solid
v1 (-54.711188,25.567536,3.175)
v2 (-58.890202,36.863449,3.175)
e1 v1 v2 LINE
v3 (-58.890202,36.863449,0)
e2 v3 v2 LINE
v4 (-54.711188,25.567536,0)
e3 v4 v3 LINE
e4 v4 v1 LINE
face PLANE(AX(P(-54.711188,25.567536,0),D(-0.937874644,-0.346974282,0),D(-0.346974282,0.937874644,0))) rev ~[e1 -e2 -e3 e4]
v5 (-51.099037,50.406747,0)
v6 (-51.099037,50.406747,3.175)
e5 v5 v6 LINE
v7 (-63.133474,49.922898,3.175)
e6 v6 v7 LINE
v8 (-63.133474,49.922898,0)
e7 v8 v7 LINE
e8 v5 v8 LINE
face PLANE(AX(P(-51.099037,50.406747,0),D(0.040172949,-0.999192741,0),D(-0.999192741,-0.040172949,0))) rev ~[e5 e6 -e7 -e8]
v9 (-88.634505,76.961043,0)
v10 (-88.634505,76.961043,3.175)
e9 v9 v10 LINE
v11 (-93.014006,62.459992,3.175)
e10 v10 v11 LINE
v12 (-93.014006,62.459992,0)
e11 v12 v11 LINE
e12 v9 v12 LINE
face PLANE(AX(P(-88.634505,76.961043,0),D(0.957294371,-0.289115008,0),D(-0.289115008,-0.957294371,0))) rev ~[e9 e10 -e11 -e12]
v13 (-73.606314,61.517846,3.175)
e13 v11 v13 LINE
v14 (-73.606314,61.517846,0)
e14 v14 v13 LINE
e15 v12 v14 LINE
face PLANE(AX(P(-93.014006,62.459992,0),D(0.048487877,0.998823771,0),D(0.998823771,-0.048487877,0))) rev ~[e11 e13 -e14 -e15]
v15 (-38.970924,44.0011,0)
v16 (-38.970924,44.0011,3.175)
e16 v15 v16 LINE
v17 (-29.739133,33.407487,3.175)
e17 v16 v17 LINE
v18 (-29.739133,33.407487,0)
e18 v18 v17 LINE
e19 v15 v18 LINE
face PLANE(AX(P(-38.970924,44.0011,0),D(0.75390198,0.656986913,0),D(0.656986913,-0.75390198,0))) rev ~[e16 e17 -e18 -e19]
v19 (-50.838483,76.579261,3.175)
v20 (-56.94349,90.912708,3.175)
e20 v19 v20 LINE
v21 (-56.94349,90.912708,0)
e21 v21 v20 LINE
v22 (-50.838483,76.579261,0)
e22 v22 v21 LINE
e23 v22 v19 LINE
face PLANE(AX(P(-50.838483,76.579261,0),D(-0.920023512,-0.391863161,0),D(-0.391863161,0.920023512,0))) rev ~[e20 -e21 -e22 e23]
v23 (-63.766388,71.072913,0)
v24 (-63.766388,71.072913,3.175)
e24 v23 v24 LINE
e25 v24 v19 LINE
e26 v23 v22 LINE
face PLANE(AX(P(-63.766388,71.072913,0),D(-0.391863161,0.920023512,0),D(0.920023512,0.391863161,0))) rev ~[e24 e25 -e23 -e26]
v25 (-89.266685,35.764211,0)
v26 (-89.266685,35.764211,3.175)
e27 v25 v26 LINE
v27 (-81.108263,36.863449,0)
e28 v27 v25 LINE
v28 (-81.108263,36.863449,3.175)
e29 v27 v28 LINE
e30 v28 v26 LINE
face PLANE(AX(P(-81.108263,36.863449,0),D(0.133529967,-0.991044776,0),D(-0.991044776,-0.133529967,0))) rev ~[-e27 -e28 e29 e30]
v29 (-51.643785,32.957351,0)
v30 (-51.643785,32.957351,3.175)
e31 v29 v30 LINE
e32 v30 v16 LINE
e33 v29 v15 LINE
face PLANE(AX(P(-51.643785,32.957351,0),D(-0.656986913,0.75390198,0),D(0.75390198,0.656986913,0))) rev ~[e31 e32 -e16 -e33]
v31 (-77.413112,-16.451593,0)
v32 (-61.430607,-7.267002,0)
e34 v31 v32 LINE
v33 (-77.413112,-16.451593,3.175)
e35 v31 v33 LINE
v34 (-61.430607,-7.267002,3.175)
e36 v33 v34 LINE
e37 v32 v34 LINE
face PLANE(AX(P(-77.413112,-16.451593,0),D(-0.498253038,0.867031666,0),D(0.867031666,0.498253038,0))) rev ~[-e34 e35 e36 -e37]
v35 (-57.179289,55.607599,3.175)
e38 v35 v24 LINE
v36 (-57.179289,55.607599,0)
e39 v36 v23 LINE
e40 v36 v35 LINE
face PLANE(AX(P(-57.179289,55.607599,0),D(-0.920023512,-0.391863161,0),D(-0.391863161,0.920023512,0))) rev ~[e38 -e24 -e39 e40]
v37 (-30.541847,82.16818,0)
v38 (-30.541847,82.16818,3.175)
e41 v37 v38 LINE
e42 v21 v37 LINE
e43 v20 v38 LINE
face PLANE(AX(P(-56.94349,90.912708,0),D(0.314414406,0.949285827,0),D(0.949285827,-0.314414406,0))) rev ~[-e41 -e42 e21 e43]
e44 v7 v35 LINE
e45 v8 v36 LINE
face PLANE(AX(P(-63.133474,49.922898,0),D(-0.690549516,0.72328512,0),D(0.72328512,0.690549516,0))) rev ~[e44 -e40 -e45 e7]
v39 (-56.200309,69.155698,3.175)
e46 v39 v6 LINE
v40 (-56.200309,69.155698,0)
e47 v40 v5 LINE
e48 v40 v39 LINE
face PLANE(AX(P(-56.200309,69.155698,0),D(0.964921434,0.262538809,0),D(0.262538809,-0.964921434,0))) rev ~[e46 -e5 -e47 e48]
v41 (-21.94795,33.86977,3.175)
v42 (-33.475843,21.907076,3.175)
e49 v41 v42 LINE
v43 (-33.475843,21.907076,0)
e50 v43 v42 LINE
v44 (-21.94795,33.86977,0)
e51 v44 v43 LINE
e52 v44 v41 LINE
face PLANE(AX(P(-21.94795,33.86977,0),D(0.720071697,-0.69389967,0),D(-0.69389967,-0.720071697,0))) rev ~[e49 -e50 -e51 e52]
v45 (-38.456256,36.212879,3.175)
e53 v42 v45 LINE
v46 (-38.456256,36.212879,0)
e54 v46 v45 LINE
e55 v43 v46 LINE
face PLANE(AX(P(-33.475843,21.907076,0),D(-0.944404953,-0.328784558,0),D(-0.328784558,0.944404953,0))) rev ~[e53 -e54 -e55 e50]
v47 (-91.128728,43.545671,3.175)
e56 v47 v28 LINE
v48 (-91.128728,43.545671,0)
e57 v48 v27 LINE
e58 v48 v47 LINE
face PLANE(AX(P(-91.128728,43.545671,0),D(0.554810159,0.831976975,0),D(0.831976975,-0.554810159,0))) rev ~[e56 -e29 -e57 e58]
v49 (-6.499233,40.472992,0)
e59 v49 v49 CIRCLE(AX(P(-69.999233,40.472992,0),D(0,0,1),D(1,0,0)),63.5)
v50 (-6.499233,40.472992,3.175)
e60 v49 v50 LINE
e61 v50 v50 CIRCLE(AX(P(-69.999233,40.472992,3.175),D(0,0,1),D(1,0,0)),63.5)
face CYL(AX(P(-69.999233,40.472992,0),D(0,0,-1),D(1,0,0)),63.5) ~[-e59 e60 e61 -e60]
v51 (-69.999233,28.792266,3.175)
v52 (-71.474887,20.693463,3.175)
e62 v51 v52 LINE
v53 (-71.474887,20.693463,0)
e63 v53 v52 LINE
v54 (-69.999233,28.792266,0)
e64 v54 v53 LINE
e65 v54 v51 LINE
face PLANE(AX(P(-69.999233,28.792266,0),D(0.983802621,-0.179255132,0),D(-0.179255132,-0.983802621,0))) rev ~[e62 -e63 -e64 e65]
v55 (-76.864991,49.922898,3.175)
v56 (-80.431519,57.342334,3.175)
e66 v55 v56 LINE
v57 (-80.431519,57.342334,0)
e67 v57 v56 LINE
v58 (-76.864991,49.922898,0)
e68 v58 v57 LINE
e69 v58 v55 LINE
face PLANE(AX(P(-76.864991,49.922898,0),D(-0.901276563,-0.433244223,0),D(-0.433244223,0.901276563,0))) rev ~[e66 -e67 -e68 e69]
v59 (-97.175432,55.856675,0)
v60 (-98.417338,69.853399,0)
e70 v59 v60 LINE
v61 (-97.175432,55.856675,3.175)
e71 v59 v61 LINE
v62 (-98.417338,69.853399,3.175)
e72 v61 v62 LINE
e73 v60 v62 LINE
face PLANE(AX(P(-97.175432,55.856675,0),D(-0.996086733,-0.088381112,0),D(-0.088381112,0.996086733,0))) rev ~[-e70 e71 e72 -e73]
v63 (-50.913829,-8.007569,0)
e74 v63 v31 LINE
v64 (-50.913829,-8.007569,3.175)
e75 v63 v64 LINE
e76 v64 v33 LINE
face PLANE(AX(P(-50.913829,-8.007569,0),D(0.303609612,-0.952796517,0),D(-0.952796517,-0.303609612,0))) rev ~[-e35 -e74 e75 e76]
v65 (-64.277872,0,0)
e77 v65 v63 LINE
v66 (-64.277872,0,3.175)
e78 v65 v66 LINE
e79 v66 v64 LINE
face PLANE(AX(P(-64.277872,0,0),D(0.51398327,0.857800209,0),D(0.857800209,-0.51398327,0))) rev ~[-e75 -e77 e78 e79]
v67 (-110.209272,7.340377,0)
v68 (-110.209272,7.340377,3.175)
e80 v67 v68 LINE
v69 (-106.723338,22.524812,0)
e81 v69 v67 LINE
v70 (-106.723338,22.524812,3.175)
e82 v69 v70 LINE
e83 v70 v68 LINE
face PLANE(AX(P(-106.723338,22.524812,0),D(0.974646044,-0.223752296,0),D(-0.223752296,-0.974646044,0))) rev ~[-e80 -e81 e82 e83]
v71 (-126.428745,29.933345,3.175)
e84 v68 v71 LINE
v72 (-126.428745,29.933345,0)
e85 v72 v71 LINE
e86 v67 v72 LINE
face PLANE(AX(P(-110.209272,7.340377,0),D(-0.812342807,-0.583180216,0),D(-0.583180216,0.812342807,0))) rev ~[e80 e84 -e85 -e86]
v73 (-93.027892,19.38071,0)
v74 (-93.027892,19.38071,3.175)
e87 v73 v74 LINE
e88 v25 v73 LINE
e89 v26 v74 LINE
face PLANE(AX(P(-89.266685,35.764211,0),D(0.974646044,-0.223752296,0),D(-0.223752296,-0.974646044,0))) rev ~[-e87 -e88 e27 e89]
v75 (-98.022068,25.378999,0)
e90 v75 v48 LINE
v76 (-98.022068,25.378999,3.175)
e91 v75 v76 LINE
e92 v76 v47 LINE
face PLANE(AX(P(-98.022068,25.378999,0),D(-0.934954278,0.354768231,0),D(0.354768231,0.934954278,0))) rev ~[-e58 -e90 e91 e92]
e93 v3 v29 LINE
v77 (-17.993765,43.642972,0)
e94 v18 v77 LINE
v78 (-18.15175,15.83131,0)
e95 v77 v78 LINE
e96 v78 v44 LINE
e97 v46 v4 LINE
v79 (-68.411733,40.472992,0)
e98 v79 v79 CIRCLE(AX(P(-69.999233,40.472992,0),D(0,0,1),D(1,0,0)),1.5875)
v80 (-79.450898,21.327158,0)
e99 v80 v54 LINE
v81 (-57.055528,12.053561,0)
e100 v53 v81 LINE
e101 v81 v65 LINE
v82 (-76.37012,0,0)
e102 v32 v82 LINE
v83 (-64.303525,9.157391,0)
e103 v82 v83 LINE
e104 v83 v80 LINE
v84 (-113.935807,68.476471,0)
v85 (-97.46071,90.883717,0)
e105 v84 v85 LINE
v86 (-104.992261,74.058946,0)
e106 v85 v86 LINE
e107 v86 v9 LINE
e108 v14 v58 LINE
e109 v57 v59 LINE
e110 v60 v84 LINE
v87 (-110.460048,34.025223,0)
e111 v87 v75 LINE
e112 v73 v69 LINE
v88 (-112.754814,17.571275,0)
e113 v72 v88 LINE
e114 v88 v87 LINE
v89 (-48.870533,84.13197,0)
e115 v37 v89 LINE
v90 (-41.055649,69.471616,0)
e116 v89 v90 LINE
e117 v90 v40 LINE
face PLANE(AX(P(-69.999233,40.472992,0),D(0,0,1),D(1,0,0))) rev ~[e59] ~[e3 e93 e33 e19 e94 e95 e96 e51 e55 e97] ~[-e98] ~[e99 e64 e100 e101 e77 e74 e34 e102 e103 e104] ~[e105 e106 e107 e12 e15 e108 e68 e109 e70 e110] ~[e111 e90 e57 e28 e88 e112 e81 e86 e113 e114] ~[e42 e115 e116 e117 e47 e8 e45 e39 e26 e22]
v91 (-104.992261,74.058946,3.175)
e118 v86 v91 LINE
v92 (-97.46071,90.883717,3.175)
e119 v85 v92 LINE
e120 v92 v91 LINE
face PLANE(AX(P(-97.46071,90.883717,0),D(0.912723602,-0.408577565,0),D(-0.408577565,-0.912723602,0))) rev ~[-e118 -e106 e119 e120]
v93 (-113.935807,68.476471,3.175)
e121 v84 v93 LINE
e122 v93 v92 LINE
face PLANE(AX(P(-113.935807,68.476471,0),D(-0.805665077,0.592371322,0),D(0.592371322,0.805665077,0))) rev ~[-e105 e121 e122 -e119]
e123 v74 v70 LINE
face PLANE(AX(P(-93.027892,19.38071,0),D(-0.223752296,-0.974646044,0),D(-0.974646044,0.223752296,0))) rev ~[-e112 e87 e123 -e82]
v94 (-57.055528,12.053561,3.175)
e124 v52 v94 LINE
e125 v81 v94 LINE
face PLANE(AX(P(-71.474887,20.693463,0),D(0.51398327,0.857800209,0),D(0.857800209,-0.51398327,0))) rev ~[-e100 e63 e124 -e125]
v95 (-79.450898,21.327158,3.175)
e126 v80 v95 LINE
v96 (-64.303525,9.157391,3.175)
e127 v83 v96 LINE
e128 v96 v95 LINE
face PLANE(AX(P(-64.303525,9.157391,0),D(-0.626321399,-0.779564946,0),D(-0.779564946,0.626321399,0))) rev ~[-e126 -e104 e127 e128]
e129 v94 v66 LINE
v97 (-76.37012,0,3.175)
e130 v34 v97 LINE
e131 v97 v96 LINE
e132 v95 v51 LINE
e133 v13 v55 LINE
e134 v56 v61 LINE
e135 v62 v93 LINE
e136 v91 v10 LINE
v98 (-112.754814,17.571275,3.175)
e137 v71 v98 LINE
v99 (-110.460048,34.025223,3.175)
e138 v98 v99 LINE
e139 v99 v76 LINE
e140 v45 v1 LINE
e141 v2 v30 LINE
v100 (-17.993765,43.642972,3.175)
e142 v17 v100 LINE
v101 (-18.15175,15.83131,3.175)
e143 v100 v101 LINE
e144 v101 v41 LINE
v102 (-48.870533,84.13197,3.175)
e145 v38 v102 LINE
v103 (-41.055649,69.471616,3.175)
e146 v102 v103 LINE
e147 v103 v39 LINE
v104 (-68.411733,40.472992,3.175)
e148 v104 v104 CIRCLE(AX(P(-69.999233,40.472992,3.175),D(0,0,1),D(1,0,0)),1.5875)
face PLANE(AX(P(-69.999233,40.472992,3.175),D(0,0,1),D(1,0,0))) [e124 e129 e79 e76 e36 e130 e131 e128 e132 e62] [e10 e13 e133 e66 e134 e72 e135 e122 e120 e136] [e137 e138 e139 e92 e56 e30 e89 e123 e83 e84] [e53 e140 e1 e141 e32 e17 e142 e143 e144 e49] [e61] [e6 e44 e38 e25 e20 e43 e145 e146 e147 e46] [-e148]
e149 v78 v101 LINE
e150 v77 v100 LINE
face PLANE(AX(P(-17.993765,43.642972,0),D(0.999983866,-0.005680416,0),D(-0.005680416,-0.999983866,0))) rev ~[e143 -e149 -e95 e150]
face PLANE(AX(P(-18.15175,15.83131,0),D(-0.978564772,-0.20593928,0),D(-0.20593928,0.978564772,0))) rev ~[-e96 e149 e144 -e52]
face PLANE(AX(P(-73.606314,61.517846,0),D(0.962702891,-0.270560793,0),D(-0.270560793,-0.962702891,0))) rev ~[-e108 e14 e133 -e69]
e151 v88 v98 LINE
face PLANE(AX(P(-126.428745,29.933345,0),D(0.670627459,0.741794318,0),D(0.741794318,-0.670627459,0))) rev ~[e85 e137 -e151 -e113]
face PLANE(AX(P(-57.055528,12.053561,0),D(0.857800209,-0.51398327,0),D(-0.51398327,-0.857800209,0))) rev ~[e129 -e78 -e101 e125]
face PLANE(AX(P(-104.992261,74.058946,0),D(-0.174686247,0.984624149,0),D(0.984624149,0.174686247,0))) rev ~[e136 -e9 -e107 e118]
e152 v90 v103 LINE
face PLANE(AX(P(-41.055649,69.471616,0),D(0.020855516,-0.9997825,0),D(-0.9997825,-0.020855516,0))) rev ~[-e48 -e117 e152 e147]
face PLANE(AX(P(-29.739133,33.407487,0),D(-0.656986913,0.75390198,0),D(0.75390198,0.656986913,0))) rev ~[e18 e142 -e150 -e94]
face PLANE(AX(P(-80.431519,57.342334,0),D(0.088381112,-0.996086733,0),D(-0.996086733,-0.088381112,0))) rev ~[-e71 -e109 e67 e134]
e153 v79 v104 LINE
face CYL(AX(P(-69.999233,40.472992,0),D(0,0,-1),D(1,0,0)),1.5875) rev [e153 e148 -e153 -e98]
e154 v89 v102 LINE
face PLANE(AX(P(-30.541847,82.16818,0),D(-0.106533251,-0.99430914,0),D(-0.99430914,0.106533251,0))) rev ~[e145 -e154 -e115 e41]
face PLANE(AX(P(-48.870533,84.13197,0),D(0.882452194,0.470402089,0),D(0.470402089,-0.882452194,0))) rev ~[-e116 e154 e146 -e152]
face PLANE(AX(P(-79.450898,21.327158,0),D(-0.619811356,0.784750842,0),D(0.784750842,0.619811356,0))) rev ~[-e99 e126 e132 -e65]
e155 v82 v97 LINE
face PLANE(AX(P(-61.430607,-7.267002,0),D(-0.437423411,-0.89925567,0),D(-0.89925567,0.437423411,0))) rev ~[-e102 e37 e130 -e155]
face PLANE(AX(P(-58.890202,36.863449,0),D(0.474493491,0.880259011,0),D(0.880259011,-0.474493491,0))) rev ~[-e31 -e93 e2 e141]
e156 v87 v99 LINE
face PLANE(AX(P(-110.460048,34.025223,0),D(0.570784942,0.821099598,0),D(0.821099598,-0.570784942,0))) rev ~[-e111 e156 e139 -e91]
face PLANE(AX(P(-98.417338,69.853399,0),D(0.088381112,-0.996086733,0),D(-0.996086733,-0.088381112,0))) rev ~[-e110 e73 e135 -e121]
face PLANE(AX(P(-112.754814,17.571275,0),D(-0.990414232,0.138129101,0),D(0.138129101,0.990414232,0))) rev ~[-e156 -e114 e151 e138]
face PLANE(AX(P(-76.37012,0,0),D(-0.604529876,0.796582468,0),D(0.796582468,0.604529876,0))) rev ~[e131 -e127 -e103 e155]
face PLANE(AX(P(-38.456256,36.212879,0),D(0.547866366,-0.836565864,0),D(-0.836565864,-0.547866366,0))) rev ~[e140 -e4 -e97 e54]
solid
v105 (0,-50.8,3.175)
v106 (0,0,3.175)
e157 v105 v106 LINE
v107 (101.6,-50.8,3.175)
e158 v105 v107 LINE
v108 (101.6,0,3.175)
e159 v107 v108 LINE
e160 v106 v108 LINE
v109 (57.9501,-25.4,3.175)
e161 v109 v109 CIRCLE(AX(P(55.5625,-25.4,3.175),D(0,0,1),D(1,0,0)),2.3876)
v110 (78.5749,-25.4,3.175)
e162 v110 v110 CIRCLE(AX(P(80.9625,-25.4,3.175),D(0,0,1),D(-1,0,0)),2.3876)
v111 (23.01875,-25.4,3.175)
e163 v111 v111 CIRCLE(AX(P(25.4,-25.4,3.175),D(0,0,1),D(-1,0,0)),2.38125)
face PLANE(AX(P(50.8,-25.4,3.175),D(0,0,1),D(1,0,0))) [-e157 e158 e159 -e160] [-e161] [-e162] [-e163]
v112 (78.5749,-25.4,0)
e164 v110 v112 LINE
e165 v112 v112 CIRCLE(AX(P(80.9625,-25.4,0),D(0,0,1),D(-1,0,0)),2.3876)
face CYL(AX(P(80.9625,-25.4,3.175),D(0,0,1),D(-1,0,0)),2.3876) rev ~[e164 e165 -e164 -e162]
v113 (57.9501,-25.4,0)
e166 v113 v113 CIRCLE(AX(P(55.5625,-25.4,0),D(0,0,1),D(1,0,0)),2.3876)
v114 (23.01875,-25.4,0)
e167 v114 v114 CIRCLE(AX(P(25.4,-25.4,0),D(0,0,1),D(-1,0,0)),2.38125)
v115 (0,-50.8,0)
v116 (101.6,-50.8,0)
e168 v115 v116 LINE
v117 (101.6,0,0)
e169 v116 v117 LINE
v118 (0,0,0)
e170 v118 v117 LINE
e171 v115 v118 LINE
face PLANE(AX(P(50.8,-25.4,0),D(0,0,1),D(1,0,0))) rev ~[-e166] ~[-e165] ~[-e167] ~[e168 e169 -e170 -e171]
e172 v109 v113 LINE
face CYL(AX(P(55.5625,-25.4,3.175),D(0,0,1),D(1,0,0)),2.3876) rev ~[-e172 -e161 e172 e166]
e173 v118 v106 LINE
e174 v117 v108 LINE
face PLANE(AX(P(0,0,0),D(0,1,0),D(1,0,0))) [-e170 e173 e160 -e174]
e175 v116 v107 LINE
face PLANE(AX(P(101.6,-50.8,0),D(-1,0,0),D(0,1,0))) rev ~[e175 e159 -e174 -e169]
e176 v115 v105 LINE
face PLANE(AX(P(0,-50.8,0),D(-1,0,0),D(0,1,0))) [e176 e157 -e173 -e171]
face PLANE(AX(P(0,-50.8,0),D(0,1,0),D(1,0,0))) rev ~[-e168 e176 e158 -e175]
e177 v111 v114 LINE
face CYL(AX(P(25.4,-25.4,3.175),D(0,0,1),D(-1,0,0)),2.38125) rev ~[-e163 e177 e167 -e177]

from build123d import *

# Parameters (mm, degrees)
F0_W     = 101.6
F0_H     = 50.8
F1_DEPTH = 3.175
F3_DEPTH = 3.176
F5_R     = 63.5
F5_R_2   = 1.5875
F6_DEPTH = 3.175


# Not quite as in the source:
# - a length typed as a fraction of an inch, garbled in the dataset ("3 / 203.2 mm" for 3/8 in), is restored


with BuildPart() as f1:
    # F0 (on Top) → F1 (new body)
    with BuildSketch(Plane.XY):
        with Locations((50.8, -25.4)):
            Rectangle(F0_W, F0_H)
    extrude(amount=F1_DEPTH)

    # F2 (on face) → F3 (cut, through all)
    with BuildSketch(Plane.XY.offset(3.175)):
        with BuildLine():
            ThreePointArc((27.78125, -25.4), (25.4, -23.01875), (23.01875, -25.4))
            Line((23.01875, -25.4), (25.4, -25.4))
            Line((25.4, -25.4), (27.78125, -25.4))
        make_face()
        with BuildLine():
            Line((25.4, -25.4), (23.01875, -25.4))
            ThreePointArc((23.01875, -25.4), (25.4, -27.78125), (27.78125, -25.4))
            Line((27.78125, -25.4), (25.4, -25.4))
        make_face()
        with BuildLine():
            Line((55.5625, -25.4), (53.1749, -25.4))
            ThreePointArc((53.1749, -25.4), (55.5625, -27.7876), (57.9501, -25.4))
            Line((57.9501, -25.4), (55.5625, -25.4))
        make_face()
        with BuildLine():
            ThreePointArc((57.9501, -25.4), (55.5625, -23.0124), (53.1749, -25.4))
            Line((53.1749, -25.4), (55.5625, -25.4))
            Line((55.5625, -25.4), (57.9501, -25.4))
        make_face()
        with BuildLine():
            ThreePointArc((83.3501, -25.4), (80.9625, -23.0124), (78.5749, -25.4))
            ThreePointArc((78.5749, -25.4), (80.9625, -27.7876), (83.3501, -25.4))
        make_face()
    extrude(amount=-F3_DEPTH, mode=Mode.SUBTRACT)


with BuildPart() as f6:
    # F5 (on Top) → F6 (new body)
    with BuildSketch(Plane.XY):
        with Locations((-69.9992328882, 40.4729917645)):
            Circle(F5_R)
        Polygon((-91.1287275403, 43.5456714677), (-81.1082634294, 36.8634489357), (-89.266684788, 35.7642112787), (-93.0278924051, 19.3807095608), (-106.7233378314, 22.5248123628), (-110.209272308, 7.3403771227), (-126.4287452471, 29.9333454927), (-112.7548140407, 17.5712748797), (-110.4600478416, 34.0252232445), (-98.0220682083, 25.3789987215), align=None, mode=Mode.SUBTRACT)
        Polygon((-79.4508978724, 21.3271584362), (-69.9992328882, 28.7922658026), (-71.4748865987, 20.6934628899), (-57.0555276033, 12.0535614183), (-64.2778724432, 0), (-50.9138293564, -8.0075692385), (-77.4131119251, -16.4515934885), (-61.4306069911, -7.2670020163), (-76.3701200485, 0), (-64.3035247922, 9.157391265), align=None, mode=Mode.SUBTRACT)
        Polygon((-54.7111884466, 25.5675363215), (-58.8902023471, 36.8634489357), (-51.6437851371, 32.9573511244), (-38.9709235648, 44.0011000734), (-29.7391327281, 33.4074866294), (-17.9937653968, 43.6429719128), (-18.1517497626, 15.8313095546), (-21.9479496944, 33.8697698701), (-33.4758427384, 21.9070757477), (-38.4562563748, 36.2128793208), align=None, mode=Mode.SUBTRACT)
        Polygon((-73.6063137641, 61.517845586), (-76.8649913447, 49.9228975744), (-80.4315193284, 57.3423342534), (-97.17543247, 55.8566748086), (-98.4173383945, 69.8533986226), (-113.9358074704, 68.4764707828), (-97.4607104577, 90.8837173921), (-104.9922611464, 74.0589461098), (-88.6345045816, 76.9610434321), (-93.0140056732, 62.4599915375), align=None, mode=Mode.SUBTRACT)
        with Locations((-69.9992328882, 40.4729917645)):
            Circle(F5_R_2, mode=Mode.SUBTRACT)
        Polygon((-51.0990368176, 50.4067470113), (-63.1334744317, 49.9228975744), (-57.1792885888, 55.6075992763), (-63.7663883979, 71.0729129616), (-50.8384830438, 76.5792612079), (-56.9434899095, 90.9127082429), (-30.5418470485, 82.1681798718), (-48.8705325686, 84.1319699794), (-41.0556492309, 69.4716163984), (-56.2003093926, 69.1556979779), align=None, mode=Mode.SUBTRACT)
    extrude(amount=F6_DEPTH)


solid = Compound([f1.part, f6.part])
